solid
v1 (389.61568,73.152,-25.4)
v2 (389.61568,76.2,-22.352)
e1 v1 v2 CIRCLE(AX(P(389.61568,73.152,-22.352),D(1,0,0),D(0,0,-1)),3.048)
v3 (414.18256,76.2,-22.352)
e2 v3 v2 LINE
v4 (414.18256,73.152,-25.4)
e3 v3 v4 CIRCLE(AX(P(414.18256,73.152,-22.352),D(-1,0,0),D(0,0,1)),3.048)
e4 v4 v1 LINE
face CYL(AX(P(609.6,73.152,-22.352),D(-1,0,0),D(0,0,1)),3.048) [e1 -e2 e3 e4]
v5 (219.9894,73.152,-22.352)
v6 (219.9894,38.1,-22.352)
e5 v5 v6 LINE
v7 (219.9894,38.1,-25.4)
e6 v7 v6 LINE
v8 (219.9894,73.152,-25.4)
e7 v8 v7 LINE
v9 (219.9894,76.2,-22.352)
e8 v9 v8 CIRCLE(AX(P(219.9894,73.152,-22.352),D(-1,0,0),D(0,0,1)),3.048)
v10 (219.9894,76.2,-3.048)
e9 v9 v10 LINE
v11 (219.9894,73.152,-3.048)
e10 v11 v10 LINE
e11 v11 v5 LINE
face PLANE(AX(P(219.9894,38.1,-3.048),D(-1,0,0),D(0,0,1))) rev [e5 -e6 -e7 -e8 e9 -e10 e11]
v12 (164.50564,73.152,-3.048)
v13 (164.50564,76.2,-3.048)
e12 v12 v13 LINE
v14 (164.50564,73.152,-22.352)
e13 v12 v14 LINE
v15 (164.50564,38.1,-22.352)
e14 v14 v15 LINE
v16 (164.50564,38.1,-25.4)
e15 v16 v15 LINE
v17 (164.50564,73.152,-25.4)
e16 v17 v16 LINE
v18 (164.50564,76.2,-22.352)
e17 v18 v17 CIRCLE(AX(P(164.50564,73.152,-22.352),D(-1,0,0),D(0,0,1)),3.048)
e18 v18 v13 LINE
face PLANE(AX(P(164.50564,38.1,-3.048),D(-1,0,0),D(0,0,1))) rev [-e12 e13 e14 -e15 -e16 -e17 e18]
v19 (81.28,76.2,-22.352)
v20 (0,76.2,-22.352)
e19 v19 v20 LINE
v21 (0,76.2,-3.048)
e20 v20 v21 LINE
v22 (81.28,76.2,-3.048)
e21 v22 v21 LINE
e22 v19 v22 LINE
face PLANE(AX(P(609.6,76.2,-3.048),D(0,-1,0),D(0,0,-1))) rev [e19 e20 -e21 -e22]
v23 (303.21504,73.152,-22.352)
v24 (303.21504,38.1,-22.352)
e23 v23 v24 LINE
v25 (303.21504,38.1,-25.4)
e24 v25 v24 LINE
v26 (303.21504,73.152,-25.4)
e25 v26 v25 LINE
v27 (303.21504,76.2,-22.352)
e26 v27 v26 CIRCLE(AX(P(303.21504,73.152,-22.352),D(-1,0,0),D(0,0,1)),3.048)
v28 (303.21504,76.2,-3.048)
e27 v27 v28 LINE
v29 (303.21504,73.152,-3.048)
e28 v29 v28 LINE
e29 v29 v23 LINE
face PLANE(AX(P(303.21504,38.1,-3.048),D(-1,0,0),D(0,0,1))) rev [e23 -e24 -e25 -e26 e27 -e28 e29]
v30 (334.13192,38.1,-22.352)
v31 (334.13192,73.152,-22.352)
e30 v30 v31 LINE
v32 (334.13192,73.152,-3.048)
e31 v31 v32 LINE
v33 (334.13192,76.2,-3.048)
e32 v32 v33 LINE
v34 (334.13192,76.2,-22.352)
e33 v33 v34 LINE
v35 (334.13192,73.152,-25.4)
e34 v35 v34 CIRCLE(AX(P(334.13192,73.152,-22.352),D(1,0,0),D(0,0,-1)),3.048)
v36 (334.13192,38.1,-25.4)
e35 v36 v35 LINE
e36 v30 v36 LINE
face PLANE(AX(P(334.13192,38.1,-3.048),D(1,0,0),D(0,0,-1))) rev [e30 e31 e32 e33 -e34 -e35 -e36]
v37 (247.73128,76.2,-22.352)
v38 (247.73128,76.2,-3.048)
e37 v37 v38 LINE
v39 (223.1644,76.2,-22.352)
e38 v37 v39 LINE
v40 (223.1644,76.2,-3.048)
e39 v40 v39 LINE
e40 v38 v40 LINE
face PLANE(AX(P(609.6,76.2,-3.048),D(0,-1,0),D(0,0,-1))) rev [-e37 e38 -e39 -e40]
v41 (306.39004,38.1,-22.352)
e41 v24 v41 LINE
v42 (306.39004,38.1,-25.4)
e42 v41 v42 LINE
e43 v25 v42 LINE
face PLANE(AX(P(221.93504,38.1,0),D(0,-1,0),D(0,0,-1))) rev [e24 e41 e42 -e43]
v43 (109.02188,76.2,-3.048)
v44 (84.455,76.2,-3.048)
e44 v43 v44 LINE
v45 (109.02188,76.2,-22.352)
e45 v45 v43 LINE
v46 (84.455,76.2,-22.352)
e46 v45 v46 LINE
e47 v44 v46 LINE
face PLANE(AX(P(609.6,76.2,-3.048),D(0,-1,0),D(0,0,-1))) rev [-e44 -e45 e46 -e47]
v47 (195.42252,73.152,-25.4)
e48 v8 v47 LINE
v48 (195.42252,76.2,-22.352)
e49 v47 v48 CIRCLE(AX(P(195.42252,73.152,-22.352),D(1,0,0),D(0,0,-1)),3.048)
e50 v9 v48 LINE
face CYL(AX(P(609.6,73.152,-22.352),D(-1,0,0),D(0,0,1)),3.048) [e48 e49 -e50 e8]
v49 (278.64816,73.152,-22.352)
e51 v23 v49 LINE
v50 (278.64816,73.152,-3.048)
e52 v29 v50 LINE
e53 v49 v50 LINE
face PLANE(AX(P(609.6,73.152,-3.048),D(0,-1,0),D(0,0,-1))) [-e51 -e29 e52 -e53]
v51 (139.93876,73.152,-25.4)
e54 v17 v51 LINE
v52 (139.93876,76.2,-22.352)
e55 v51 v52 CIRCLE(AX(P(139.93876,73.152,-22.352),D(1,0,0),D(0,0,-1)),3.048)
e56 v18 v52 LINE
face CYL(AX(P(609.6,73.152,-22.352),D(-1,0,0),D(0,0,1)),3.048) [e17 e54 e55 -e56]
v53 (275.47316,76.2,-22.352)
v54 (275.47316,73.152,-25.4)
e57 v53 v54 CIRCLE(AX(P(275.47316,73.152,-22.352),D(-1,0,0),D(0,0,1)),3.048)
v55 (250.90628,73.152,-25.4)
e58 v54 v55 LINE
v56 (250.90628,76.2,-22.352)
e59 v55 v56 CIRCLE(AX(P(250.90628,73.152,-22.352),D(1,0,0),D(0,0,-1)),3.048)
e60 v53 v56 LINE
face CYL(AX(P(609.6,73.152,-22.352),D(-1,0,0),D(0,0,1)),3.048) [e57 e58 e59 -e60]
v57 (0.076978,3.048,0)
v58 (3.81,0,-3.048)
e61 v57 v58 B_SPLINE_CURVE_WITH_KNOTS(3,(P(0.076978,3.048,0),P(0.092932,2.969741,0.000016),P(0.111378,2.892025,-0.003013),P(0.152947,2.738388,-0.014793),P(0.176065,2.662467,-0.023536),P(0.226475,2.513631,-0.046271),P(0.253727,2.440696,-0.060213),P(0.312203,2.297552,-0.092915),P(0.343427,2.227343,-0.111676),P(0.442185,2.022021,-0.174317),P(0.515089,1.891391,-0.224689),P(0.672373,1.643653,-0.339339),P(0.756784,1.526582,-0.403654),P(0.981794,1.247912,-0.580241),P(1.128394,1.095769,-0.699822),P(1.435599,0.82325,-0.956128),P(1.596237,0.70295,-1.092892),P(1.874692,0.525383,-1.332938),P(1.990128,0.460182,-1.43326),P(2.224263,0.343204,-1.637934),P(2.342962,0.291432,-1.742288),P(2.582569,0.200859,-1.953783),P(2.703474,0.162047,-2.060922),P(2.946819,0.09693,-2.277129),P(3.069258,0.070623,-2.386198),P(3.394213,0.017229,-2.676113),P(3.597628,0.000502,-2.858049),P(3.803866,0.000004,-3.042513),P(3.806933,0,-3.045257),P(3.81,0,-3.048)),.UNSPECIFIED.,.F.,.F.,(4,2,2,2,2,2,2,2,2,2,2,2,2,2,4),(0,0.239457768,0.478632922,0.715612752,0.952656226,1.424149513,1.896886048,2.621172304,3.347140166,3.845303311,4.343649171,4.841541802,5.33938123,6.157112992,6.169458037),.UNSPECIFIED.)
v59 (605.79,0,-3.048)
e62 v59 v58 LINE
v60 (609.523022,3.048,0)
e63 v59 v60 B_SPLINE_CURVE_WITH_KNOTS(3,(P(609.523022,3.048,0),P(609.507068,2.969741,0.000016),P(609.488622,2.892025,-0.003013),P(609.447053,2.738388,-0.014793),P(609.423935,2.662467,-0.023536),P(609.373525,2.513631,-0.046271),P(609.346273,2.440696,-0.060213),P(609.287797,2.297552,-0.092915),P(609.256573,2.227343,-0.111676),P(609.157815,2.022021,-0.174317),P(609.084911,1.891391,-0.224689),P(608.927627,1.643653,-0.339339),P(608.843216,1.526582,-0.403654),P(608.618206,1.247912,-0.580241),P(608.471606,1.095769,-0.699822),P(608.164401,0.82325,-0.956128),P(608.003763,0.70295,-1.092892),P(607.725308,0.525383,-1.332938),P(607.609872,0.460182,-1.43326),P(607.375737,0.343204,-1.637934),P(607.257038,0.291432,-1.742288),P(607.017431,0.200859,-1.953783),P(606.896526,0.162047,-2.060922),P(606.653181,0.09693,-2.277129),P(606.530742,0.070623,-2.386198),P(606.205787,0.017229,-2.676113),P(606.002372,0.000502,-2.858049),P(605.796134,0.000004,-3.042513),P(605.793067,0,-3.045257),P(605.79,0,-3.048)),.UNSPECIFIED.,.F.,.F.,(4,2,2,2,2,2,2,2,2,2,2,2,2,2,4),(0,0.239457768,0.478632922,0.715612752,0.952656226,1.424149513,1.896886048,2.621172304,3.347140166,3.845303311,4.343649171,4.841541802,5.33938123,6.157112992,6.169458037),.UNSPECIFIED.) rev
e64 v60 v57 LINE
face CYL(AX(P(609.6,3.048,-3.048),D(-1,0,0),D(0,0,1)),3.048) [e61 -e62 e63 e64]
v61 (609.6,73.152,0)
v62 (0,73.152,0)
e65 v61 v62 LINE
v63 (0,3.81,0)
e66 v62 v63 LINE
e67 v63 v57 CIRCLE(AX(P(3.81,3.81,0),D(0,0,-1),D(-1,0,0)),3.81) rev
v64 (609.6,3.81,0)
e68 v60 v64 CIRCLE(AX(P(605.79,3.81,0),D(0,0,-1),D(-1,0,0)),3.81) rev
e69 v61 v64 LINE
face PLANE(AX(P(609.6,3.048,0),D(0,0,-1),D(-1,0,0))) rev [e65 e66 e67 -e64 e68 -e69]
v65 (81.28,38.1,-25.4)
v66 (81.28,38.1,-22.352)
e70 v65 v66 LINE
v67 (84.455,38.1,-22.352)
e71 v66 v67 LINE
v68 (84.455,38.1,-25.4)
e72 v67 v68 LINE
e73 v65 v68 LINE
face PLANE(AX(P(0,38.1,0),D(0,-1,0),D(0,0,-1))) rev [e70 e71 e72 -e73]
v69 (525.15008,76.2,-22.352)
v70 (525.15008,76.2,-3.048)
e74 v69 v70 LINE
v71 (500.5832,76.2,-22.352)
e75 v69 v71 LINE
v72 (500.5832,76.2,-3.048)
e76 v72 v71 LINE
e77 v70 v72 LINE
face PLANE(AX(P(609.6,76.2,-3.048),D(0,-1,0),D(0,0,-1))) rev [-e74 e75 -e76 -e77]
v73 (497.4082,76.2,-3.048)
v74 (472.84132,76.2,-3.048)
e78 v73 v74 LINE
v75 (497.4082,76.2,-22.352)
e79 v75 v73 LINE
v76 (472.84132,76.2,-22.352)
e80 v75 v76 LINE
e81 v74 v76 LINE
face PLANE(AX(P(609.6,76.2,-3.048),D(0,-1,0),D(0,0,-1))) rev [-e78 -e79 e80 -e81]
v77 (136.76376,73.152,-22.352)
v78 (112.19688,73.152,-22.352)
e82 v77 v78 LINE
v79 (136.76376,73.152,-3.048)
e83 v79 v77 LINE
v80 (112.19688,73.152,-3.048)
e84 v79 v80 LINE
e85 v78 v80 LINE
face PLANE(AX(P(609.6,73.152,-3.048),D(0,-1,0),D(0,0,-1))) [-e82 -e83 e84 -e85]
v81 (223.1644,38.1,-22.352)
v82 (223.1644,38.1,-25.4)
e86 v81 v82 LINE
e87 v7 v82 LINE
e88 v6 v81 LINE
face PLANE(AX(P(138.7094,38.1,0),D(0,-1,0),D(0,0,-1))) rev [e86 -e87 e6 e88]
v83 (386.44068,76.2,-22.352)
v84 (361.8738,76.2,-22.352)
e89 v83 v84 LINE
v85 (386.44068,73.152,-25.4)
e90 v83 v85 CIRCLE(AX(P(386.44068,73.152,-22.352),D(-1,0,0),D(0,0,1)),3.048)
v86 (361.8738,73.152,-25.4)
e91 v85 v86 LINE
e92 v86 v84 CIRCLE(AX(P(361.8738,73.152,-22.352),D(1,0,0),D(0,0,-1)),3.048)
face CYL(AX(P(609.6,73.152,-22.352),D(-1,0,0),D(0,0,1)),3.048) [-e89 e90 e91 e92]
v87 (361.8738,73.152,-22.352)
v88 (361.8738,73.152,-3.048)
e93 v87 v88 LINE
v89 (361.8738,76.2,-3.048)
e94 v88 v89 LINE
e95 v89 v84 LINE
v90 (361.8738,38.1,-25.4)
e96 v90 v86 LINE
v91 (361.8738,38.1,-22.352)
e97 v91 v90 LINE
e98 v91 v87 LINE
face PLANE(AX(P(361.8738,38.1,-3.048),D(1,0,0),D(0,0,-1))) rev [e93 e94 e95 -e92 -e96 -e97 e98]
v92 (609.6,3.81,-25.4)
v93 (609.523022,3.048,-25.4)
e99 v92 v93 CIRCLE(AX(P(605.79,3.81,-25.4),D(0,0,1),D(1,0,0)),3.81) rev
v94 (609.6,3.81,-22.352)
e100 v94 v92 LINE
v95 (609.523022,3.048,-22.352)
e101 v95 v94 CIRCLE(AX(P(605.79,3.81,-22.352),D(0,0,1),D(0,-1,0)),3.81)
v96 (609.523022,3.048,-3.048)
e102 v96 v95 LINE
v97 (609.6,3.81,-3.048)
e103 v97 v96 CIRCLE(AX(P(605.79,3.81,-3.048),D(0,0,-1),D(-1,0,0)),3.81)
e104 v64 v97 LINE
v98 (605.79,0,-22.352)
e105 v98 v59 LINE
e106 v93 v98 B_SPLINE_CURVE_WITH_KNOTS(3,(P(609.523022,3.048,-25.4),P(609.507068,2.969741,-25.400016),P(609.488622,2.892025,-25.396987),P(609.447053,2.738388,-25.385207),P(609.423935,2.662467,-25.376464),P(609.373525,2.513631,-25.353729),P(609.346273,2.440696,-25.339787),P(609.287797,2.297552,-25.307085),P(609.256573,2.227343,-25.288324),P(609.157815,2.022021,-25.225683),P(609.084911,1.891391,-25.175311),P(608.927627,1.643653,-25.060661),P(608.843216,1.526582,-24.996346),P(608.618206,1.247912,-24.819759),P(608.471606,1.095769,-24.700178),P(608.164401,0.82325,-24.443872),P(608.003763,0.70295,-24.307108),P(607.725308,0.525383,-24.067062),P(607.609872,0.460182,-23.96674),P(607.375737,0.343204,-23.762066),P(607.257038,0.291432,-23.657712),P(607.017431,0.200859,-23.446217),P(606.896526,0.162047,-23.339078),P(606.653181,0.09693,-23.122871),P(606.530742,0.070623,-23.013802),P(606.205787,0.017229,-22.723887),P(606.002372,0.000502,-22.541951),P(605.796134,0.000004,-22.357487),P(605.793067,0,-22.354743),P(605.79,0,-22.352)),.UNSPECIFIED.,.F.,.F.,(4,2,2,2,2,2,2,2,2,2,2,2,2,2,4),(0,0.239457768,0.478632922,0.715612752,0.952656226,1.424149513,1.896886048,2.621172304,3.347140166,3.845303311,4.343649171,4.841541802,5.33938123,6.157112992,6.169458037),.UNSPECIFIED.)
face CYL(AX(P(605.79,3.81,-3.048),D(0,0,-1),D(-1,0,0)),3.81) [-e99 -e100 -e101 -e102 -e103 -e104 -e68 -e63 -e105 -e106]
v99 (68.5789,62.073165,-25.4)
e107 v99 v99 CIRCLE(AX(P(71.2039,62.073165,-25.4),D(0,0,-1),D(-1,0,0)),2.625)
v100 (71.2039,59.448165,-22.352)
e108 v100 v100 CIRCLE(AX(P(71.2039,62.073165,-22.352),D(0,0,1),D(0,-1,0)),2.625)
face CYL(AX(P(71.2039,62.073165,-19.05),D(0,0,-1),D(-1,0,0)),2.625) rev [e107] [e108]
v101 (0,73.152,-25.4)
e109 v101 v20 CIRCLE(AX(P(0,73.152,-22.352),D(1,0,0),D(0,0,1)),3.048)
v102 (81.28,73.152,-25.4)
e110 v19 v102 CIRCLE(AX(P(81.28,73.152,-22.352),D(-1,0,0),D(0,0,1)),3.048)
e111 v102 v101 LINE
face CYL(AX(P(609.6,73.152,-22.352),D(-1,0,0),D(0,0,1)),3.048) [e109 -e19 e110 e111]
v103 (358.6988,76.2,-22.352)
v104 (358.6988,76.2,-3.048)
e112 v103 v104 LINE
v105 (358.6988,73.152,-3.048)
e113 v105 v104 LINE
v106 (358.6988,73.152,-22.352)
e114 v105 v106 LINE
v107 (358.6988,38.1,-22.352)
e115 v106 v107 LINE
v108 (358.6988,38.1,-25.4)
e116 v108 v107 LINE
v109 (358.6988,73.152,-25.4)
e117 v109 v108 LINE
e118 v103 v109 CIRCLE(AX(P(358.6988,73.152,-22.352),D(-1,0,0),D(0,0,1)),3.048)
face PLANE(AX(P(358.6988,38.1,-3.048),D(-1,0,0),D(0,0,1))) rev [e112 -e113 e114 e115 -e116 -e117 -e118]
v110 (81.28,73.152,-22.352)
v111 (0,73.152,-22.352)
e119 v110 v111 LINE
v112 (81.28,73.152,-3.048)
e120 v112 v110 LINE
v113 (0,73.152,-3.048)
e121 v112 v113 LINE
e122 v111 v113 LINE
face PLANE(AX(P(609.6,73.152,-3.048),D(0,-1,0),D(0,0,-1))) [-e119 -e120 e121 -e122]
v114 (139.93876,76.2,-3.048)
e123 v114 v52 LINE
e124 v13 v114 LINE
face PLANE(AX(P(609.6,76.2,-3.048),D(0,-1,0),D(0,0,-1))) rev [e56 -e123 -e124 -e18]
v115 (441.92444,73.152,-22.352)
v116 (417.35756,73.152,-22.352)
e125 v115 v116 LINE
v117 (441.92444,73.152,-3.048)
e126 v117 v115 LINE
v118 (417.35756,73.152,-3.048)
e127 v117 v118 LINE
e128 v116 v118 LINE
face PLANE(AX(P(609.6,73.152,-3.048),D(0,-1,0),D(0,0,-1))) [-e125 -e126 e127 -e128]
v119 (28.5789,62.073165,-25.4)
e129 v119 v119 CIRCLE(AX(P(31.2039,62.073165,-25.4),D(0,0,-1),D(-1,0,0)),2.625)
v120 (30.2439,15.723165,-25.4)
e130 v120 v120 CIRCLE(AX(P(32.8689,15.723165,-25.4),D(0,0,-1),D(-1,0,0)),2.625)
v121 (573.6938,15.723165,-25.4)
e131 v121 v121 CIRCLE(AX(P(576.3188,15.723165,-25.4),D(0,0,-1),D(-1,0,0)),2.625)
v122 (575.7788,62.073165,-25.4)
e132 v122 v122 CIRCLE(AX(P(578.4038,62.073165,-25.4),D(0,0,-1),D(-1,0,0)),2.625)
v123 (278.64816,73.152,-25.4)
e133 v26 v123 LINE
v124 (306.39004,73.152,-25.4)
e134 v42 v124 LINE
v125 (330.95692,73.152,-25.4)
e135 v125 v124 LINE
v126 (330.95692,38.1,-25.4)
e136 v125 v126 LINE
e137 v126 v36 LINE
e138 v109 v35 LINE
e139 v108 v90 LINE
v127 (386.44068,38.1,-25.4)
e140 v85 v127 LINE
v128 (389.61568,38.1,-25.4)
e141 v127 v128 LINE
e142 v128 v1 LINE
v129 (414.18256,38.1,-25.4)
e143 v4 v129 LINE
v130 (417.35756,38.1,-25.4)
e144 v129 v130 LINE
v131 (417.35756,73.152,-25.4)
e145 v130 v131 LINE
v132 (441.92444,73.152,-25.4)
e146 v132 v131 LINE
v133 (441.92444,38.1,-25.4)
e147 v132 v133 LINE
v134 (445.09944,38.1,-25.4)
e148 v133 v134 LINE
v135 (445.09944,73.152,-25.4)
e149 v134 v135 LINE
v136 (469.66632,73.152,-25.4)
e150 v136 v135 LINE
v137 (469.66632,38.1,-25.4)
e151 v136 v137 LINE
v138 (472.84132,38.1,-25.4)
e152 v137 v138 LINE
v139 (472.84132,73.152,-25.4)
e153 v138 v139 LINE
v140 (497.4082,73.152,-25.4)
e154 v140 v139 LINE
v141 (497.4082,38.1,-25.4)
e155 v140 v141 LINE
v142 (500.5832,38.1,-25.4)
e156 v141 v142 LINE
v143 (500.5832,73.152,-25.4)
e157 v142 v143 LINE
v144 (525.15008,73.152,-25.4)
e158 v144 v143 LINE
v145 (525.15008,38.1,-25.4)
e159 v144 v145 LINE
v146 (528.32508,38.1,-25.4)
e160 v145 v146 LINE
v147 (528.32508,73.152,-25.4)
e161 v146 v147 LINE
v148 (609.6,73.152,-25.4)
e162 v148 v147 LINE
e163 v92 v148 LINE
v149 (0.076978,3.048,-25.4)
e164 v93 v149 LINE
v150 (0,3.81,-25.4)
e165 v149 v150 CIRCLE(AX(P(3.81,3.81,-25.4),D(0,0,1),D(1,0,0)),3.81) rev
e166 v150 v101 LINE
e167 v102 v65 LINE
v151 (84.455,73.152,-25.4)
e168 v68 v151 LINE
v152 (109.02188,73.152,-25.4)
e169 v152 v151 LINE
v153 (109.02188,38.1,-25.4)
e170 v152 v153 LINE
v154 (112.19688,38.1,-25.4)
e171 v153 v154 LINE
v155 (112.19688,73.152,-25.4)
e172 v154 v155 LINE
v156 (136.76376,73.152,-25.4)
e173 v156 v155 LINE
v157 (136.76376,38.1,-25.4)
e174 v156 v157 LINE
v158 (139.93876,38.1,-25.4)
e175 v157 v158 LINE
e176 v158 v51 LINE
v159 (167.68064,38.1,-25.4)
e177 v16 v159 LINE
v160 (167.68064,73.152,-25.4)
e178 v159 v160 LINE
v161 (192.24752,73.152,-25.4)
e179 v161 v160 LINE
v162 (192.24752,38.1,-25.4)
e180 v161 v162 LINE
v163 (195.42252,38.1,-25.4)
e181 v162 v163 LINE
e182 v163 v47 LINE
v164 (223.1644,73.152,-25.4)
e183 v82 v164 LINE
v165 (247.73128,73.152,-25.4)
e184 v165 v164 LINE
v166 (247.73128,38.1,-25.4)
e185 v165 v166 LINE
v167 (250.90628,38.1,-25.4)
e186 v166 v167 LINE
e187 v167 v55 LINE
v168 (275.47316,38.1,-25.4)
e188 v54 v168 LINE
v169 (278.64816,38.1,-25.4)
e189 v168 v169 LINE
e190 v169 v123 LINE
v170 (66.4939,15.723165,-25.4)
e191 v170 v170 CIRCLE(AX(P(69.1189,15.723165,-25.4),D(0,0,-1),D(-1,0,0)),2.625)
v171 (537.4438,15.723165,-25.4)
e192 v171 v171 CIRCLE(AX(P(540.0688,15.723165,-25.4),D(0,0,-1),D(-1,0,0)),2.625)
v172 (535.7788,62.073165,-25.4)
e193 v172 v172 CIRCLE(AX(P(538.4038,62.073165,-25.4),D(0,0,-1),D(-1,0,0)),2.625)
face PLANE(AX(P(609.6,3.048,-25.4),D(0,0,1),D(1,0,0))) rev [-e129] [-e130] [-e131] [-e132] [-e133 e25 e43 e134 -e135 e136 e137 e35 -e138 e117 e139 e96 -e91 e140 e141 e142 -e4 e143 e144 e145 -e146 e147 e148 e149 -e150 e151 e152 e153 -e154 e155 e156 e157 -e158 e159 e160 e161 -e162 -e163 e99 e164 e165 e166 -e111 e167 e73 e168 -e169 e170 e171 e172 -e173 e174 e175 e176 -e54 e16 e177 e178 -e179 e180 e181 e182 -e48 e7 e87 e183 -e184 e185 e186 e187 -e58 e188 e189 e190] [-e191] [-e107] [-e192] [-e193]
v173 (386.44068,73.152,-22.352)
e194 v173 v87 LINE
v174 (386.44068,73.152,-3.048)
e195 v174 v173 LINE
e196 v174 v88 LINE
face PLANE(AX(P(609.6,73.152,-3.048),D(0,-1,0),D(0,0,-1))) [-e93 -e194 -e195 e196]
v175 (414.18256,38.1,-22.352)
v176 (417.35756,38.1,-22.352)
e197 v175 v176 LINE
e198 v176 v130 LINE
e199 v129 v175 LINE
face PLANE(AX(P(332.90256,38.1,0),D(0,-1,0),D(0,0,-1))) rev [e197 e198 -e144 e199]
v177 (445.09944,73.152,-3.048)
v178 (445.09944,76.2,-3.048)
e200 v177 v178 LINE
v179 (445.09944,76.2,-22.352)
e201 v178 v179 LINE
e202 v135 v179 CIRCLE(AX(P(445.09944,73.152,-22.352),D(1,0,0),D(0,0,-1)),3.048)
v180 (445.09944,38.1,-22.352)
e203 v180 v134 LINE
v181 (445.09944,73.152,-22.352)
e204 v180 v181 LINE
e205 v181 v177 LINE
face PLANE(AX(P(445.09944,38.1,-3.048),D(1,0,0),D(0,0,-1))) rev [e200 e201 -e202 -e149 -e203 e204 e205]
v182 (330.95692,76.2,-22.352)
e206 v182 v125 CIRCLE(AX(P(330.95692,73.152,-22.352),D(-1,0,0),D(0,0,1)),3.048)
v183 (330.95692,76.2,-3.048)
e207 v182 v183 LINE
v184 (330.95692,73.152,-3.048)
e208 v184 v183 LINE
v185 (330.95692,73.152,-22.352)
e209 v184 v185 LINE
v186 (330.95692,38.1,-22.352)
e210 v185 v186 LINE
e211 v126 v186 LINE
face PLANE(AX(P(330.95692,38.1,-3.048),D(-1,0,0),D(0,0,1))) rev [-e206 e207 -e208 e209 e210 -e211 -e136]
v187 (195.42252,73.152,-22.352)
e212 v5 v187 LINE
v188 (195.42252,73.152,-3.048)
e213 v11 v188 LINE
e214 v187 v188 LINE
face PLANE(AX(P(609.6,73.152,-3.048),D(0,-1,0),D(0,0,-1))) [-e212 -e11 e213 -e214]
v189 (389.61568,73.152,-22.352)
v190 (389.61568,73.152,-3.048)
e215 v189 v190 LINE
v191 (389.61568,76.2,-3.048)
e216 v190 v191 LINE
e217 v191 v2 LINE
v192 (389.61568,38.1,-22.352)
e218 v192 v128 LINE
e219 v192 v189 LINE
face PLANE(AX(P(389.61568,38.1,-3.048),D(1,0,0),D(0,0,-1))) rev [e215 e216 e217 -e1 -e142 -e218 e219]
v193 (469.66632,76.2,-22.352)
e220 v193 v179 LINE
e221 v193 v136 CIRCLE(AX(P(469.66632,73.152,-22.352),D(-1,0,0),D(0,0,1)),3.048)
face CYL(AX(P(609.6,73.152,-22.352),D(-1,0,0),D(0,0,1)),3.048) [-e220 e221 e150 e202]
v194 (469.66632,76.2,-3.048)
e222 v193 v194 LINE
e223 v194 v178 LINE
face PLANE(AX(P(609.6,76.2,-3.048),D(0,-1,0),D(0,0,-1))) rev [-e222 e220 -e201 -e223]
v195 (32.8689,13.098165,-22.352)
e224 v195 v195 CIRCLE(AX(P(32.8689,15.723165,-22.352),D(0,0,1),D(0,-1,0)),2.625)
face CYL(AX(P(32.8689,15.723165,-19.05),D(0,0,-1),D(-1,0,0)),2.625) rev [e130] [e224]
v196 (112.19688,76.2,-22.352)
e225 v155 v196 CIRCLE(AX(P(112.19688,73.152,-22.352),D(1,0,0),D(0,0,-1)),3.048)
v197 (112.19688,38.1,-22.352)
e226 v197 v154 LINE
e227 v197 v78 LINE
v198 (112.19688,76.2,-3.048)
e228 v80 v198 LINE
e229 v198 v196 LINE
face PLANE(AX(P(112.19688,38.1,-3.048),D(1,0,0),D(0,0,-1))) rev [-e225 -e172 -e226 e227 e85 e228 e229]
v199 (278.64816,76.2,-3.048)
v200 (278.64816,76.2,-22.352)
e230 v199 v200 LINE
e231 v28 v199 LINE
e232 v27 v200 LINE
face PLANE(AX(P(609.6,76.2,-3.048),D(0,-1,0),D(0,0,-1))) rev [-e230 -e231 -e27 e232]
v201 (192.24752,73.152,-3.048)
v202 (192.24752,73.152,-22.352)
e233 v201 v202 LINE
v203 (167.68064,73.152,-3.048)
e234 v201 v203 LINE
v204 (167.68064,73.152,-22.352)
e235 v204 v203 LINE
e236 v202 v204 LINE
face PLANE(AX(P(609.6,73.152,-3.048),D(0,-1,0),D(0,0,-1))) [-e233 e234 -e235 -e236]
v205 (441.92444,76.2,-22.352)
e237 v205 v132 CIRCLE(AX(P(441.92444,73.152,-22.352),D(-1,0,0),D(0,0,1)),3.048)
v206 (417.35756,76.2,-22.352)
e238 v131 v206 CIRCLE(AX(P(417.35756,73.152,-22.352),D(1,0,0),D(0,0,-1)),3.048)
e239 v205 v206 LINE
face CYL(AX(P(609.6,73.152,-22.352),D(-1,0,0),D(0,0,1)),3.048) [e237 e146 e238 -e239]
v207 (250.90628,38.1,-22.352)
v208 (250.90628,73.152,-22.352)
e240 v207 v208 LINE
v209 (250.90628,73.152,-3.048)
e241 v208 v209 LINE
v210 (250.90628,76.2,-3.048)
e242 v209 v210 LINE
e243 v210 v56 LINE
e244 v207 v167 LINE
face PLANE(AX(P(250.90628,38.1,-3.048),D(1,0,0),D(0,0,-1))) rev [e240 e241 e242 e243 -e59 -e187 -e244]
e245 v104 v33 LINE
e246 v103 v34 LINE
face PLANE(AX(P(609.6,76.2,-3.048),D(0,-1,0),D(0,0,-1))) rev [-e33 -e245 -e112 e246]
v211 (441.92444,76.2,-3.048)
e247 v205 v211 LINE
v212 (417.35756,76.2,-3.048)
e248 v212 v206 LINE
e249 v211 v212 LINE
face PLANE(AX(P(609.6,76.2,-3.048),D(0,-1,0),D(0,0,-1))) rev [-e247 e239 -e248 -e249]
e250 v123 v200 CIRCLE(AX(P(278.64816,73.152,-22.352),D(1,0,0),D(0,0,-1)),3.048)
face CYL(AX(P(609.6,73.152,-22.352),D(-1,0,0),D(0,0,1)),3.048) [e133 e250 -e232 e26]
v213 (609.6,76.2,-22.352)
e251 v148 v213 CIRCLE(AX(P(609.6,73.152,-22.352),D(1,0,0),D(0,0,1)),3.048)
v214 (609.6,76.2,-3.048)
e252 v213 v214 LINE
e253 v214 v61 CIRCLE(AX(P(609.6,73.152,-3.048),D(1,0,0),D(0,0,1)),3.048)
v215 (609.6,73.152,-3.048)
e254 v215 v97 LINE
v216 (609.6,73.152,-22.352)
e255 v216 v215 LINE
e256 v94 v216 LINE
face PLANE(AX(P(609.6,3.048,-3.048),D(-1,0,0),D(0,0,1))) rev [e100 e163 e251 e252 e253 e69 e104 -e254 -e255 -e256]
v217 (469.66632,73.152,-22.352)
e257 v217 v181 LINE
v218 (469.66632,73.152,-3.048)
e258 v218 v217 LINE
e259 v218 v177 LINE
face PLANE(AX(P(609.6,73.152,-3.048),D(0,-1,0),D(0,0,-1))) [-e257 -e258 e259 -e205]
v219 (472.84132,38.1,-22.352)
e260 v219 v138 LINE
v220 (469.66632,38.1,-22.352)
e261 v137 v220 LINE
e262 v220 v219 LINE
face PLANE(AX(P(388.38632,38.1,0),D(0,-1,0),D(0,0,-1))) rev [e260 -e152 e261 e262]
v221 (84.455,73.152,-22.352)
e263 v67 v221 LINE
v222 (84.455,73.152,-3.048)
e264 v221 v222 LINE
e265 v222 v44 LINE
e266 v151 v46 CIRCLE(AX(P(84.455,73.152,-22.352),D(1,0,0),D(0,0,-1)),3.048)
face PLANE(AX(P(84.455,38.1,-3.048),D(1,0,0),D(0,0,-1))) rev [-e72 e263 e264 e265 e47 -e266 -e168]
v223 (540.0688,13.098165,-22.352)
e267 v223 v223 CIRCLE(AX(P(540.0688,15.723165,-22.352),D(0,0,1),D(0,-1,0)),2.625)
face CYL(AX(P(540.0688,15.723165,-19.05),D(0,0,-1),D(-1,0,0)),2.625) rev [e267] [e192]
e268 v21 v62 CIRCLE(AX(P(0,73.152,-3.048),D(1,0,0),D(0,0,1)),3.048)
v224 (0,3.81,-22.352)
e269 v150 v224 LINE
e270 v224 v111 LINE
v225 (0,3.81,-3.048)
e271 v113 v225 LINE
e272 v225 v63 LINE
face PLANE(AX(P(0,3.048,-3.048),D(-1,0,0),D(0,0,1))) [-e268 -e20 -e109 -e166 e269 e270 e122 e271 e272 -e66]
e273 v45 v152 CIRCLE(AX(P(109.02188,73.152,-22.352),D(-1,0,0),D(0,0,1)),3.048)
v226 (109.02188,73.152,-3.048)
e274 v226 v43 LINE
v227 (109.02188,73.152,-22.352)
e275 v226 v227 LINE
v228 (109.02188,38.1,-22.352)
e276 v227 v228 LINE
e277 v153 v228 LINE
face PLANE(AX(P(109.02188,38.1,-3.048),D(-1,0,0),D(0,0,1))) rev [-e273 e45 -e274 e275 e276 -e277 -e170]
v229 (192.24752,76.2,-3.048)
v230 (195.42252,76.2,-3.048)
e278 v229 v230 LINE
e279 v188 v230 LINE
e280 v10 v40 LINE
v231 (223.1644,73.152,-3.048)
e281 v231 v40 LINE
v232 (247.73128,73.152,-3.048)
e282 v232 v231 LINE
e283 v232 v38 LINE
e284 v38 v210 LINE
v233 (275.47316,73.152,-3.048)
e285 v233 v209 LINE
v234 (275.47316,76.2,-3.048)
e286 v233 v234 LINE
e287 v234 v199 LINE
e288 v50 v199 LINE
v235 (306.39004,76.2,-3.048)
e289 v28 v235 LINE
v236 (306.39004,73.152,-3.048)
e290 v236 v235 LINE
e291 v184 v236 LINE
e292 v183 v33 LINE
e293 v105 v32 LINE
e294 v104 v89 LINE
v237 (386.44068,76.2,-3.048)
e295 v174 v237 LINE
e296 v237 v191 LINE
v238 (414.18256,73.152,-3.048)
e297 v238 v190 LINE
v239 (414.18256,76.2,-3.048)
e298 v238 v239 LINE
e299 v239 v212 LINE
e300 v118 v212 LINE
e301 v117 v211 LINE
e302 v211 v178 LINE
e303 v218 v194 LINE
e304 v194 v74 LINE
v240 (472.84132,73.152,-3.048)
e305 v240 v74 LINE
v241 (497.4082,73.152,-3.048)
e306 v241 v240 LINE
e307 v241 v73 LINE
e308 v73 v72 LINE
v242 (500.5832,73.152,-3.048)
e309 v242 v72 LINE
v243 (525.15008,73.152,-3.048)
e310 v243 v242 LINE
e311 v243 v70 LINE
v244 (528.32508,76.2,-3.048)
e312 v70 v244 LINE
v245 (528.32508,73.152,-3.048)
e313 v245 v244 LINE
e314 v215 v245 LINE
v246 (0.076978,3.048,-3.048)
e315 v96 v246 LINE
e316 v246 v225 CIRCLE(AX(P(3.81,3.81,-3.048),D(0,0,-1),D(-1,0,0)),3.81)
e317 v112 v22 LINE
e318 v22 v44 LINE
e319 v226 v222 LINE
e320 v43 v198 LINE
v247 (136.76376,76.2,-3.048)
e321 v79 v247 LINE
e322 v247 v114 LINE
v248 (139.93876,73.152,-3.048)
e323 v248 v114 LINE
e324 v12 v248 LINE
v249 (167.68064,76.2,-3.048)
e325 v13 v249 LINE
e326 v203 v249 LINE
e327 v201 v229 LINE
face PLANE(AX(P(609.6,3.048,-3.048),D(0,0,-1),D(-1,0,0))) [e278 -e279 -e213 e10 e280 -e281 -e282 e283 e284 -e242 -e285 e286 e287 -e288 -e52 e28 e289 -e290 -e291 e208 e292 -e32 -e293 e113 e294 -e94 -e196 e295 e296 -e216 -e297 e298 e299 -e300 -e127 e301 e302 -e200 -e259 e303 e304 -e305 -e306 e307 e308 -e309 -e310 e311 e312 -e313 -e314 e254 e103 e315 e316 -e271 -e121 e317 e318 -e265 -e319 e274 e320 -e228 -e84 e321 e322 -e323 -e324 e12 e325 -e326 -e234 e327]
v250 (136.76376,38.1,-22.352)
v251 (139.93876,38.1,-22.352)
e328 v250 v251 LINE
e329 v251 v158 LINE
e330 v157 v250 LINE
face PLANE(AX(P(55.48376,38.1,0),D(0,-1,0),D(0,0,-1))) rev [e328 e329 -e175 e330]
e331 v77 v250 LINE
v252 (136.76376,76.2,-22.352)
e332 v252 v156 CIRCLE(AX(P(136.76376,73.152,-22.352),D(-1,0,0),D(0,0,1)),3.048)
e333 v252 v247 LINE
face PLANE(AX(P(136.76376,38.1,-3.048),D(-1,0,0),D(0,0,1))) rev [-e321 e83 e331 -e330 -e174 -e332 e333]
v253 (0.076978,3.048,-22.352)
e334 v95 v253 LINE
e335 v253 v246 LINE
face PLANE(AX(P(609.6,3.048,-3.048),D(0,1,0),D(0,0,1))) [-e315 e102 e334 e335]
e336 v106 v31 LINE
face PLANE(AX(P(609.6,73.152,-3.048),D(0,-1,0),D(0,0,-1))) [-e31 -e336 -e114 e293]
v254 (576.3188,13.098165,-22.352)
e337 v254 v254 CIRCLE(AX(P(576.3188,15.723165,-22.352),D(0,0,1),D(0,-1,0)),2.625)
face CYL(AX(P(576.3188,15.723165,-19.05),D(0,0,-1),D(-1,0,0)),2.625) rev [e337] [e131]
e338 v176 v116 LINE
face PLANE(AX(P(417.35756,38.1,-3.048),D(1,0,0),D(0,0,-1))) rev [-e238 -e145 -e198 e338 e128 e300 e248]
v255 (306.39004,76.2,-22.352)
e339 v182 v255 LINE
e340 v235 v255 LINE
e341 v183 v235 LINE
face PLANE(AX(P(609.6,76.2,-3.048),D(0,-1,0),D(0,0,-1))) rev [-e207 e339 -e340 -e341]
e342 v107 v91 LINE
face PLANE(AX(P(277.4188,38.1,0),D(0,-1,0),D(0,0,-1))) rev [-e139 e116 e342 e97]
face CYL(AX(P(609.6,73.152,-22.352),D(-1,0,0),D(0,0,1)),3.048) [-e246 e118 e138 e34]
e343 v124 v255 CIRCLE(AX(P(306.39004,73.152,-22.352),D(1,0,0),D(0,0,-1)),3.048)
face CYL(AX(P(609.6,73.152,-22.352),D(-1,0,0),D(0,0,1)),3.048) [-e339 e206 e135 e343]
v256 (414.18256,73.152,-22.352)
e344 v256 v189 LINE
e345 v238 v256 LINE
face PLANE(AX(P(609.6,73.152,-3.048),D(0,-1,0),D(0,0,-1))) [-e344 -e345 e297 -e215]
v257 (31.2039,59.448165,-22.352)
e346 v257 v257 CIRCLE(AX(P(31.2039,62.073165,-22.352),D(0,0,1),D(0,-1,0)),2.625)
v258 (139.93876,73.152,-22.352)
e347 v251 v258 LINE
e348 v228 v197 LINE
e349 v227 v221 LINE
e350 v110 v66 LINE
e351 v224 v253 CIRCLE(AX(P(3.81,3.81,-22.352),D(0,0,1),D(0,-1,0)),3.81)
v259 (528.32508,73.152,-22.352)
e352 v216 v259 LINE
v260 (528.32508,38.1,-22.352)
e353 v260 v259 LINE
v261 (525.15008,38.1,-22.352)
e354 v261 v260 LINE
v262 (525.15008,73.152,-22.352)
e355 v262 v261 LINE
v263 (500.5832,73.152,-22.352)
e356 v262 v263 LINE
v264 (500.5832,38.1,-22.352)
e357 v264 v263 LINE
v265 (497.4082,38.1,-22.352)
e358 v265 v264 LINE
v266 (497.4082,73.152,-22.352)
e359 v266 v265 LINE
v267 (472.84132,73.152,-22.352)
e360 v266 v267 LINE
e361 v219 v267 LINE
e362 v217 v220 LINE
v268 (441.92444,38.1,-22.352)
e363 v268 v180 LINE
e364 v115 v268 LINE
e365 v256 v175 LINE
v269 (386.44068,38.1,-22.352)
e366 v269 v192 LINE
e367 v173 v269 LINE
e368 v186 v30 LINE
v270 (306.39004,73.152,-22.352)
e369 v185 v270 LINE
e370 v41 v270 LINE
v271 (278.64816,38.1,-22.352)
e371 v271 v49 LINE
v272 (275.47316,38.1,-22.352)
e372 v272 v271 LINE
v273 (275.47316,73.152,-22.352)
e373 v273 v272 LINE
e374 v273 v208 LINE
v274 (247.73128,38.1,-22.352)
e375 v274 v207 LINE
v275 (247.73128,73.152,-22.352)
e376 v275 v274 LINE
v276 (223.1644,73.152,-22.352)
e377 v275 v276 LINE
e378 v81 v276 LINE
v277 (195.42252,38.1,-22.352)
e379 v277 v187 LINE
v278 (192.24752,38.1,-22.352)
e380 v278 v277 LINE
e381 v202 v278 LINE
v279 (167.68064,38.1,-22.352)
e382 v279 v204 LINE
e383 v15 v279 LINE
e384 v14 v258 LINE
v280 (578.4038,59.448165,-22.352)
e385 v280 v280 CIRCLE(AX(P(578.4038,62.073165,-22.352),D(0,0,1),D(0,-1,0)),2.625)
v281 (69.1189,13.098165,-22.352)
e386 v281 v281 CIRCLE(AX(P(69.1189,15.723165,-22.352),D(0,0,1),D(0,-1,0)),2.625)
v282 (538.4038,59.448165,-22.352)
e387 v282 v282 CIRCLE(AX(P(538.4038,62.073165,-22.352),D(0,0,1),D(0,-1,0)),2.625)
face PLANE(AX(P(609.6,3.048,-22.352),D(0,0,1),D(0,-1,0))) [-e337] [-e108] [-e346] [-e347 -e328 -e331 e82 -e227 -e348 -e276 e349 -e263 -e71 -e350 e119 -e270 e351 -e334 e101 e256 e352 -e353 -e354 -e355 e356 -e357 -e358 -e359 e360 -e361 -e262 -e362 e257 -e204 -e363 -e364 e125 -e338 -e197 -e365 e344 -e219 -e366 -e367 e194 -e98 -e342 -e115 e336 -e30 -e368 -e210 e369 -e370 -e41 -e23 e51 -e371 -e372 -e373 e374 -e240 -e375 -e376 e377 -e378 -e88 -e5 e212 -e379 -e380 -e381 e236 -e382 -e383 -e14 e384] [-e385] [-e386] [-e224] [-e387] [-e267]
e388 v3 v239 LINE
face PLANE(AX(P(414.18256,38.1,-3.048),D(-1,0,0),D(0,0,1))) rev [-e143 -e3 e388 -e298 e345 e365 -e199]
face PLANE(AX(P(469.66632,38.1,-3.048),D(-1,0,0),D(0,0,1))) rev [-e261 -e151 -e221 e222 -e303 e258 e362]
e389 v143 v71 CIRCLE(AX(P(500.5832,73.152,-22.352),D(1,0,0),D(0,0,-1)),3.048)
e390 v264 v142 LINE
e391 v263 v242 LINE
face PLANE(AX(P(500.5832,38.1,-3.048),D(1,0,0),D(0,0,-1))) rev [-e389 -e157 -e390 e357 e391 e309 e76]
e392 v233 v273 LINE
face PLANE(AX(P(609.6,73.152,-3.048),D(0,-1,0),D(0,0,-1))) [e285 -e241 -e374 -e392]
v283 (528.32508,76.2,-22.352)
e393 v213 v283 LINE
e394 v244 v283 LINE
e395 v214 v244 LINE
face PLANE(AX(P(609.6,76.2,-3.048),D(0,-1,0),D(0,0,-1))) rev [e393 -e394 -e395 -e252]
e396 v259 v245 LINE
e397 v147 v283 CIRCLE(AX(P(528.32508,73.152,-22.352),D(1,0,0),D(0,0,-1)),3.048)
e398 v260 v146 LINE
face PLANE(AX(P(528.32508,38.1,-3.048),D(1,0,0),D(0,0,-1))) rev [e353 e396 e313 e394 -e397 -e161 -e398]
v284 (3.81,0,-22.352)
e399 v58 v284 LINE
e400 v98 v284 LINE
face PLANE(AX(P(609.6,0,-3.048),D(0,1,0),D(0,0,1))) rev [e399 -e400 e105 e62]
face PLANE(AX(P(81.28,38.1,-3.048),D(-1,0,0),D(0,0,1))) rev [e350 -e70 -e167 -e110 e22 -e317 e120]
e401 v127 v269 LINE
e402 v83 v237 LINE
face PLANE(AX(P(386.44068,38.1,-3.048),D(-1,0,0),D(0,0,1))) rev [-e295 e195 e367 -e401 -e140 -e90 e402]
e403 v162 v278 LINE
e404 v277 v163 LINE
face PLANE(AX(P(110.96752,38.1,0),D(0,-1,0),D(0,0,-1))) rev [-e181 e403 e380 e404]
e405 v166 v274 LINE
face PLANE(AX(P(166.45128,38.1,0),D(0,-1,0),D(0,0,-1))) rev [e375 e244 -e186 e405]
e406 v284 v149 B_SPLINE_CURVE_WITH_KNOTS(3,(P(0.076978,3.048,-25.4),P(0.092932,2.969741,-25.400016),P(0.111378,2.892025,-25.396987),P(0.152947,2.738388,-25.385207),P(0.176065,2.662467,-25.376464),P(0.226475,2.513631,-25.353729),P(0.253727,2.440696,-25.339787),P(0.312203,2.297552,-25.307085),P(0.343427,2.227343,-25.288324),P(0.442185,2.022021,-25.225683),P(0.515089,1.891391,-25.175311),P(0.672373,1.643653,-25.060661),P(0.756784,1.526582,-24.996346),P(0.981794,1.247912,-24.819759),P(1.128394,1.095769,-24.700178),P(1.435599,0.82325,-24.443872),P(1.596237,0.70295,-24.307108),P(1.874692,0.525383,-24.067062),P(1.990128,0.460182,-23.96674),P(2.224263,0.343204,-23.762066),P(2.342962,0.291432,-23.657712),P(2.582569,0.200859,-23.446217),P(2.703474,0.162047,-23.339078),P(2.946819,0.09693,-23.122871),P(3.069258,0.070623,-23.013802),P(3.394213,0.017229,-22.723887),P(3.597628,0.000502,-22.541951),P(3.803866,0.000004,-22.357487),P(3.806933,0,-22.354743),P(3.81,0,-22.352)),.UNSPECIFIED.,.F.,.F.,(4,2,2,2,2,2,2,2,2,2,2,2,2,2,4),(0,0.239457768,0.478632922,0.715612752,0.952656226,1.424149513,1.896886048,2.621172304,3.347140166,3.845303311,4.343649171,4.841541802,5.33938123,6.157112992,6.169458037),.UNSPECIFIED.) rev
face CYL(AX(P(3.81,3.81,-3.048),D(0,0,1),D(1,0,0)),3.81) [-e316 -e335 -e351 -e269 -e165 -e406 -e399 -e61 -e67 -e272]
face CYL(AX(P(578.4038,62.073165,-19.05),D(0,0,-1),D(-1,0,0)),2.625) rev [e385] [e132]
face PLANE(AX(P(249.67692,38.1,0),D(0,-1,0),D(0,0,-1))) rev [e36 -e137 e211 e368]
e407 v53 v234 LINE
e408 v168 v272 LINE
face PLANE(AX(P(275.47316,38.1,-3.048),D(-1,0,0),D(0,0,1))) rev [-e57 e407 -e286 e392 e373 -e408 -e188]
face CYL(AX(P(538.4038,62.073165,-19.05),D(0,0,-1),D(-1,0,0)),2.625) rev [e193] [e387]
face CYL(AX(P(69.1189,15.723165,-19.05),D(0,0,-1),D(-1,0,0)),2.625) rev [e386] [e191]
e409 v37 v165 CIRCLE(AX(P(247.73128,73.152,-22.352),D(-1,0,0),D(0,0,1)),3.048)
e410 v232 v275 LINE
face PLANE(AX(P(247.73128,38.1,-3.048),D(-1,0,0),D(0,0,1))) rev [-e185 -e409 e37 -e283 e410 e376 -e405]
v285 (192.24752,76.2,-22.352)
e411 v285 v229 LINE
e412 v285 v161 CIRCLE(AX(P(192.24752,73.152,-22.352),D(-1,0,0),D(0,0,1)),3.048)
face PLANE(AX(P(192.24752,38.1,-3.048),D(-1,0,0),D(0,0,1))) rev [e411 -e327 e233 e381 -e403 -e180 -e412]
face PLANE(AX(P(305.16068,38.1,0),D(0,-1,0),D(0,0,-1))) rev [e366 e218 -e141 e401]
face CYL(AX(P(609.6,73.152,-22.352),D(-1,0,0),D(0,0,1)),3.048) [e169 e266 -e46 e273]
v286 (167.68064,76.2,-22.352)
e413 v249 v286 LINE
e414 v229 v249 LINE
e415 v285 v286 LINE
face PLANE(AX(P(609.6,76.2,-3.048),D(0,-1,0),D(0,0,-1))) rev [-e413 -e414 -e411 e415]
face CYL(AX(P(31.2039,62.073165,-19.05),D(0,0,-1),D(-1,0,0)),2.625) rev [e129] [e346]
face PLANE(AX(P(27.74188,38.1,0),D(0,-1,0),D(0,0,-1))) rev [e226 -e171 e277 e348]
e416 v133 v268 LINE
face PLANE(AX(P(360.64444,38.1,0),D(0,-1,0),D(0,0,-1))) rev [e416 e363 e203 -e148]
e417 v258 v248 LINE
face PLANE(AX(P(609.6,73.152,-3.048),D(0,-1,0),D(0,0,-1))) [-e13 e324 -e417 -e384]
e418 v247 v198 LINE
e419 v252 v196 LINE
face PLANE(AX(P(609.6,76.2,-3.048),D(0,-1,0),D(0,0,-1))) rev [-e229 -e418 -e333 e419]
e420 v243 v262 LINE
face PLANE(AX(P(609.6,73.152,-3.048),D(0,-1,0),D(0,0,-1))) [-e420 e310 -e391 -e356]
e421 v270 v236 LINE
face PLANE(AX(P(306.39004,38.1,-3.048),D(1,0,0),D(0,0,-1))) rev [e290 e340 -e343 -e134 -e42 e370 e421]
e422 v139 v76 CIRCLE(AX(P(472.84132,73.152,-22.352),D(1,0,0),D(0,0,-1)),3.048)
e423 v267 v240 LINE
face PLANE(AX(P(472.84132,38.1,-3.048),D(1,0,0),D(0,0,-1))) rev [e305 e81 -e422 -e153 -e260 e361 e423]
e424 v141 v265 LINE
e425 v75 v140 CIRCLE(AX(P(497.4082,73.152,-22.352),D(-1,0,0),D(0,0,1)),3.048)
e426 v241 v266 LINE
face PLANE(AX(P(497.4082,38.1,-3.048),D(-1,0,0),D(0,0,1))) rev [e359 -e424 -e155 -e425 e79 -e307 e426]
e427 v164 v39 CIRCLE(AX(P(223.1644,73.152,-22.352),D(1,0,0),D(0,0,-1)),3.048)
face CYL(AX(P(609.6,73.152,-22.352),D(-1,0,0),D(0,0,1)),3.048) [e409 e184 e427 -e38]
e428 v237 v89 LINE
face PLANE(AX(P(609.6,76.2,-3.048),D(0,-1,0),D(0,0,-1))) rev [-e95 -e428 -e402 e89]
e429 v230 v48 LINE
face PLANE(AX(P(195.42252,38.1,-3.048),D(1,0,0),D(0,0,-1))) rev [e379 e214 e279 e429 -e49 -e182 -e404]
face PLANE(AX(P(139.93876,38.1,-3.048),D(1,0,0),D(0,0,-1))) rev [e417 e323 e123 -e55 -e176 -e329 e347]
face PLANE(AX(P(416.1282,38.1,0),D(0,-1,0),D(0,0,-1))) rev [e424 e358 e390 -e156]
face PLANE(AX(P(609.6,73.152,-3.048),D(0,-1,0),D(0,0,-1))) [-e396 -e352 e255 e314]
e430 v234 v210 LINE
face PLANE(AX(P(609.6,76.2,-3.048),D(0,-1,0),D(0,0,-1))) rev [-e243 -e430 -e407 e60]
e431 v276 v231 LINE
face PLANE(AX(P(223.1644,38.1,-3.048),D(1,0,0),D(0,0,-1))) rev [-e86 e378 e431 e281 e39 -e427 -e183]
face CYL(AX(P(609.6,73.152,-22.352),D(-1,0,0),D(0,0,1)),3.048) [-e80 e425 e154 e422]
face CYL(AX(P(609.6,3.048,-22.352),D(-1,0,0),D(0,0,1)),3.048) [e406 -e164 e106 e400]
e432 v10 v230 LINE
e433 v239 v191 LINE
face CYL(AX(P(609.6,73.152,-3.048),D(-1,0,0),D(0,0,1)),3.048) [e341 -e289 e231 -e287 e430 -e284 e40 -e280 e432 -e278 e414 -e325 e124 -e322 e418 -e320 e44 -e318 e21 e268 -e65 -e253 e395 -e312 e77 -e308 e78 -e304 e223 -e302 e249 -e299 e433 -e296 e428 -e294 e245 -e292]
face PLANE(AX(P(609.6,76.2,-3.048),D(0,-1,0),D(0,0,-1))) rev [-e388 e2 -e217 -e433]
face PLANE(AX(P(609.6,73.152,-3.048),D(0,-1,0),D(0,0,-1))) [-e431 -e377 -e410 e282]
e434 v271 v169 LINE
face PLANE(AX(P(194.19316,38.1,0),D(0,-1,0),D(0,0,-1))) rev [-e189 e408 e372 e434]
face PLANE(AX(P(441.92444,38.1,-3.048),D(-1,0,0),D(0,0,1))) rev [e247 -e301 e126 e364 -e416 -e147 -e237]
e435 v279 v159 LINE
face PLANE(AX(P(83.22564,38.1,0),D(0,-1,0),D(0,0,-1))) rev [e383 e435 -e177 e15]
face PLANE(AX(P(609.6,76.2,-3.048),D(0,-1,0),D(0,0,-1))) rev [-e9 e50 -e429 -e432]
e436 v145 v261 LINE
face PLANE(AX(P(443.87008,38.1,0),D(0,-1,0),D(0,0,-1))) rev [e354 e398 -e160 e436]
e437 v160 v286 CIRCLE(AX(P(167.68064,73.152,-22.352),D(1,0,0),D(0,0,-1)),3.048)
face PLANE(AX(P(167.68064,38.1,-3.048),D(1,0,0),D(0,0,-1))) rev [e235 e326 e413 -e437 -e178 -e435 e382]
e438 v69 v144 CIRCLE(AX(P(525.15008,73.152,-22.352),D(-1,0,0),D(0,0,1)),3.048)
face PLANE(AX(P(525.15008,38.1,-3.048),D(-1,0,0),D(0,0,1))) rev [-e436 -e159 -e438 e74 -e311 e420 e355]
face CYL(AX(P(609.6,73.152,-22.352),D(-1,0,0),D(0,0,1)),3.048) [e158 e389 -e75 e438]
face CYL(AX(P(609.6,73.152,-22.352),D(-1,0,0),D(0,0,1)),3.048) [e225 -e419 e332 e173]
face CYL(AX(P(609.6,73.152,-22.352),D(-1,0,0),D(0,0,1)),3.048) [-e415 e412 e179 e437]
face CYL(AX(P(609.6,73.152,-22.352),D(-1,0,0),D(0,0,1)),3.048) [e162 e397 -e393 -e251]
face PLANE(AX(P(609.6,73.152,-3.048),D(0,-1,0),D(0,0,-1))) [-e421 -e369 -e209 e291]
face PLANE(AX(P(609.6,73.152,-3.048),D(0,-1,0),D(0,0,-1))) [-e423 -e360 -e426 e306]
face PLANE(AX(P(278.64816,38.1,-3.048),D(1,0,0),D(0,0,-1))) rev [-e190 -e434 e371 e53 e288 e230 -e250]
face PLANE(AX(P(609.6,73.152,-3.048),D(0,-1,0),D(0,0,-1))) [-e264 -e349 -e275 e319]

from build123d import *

# Parameters (mm, degrees)
SKETCH1_W           = 19.304
SKETCH1_H           = 70.104
BOSS_EXTRUDE1_DEPTH = 609.6
SKETCH2_W           = 3.175
SKETCH2_H           = 38.1
CUT_EXTRUDE1_DEPTH  = 38.1
LPATTERN1_COUNT     = 17
LPATTERN1_PITCH     = 27.74188
FILLET1_R           = 3.81
SKETCH4_R           = 2.625
CUT_EXTRUDE2_DEPTH  = 6.35
LPATTERN2_COUNT     = 2
LPATTERN2_PITCH     = 507.1999


with BuildPart() as part:
    # Sketch1 → Boss-Extrude1 (new body)
    with BuildSketch(Plane(origin=(0, 0, 0), x_dir=(0, 0, -1), z_dir=(1, 0, 0))):
        with BuildLine():
            Line((3.048, 0), (22.352, 0))
            ThreePointArc((22.352, 0), (24.507261469, 0.892738531), (25.4, 3.048))
            Line((25.4, 3.048), (25.4, 73.152))
            ThreePointArc((25.4, 73.152), (24.507261469, 75.307261469), (22.352, 76.2))
            Line((22.352, 76.2), (3.048, 76.2))
            ThreePointArc((3.048, 76.2), (0.892738531, 75.307261469), (0, 73.152))
            Line((0, 73.152), (0, 3.048))
            ThreePointArc((0, 3.048), (0.892738531, 0.892738531), (3.048, 0))
        make_face()
        with Locations((12.7, 38.1)):
            Rectangle(SKETCH1_W, SKETCH1_H, mode=Mode.SUBTRACT)
    extrude(amount=BOSS_EXTRUDE1_DEPTH)

    # Sketch2 → Cut-Extrude1 (cut)
    with BuildSketch(Plane(origin=(0, 76.2, 0), x_dir=(1, 0, 0), z_dir=(0, 1, 0))):
        with Locations((82.8675, 22.098)):
            Rectangle(SKETCH2_W, SKETCH2_H)
    cut_extrude1 = extrude(amount=-CUT_EXTRUDE1_DEPTH, mode=Mode.SUBTRACT)

    # LPattern1: Cut-Extrude1 ×17
    with Locations(*[(i * LPATTERN1_PITCH, 0, 0) for i in range(1, LPATTERN1_COUNT)]):
        add(cut_extrude1, mode=Mode.SUBTRACT)

    # Fillet1
    # the kernel refuses this fillet: 3.81 mm, written as the material it takes off along each edge
    with BuildSketch(Plane(origin=(609.6, 0, 6.477), x_dir=(0, 1, 0), z_dir=(0, 0, -1))) as fillet1_piece_1:
        with BuildLine():
            CenterArc((FILLET1_R, -FILLET1_R), FILLET1_R, 90, 90)
            Line((0, -FILLET1_R), (0, 0))
            Line((0, 0), (FILLET1_R, 0))
        make_face()
    extrude(amount=38.354, mode=Mode.SUBTRACT)
    with BuildSketch(Plane(origin=(0, 0, 6.477), x_dir=(0, 1, 0), z_dir=(0, 0, -1))) as fillet1_piece_2:
        with BuildLine():
            CenterArc((FILLET1_R, FILLET1_R), FILLET1_R, 180, 90)
            Line((0, FILLET1_R), (0, 0))
            Line((0, 0), (FILLET1_R, 0))
        make_face()
    extrude(amount=38.354, mode=Mode.SUBTRACT)

    # Sketch4 → Cut-Extrude2 (cut)
    with BuildSketch(Plane(origin=(0, 0, -25.4), x_dir=(-1, 0, 0), z_dir=(0, 0, -1))):
        with Locations((-578.4038, 62.073165047)):
            Circle(SKETCH4_R)
        with Locations((-538.4038, 62.073165047)):
            Circle(SKETCH4_R)
        with Locations((-540.0688, 15.723165047)):
            Circle(SKETCH4_R)
        with Locations((-576.3188, 15.723165047)):
            Circle(SKETCH4_R)
    cut_extrude2 = extrude(amount=-CUT_EXTRUDE2_DEPTH, mode=Mode.SUBTRACT)

    # LPattern2: Cut-Extrude2 ×2
    with Locations(*[(-i * LPATTERN2_PITCH, 0, 0) for i in range(1, LPATTERN2_COUNT)]):
        add(cut_extrude2, mode=Mode.SUBTRACT)


solid = part.part
